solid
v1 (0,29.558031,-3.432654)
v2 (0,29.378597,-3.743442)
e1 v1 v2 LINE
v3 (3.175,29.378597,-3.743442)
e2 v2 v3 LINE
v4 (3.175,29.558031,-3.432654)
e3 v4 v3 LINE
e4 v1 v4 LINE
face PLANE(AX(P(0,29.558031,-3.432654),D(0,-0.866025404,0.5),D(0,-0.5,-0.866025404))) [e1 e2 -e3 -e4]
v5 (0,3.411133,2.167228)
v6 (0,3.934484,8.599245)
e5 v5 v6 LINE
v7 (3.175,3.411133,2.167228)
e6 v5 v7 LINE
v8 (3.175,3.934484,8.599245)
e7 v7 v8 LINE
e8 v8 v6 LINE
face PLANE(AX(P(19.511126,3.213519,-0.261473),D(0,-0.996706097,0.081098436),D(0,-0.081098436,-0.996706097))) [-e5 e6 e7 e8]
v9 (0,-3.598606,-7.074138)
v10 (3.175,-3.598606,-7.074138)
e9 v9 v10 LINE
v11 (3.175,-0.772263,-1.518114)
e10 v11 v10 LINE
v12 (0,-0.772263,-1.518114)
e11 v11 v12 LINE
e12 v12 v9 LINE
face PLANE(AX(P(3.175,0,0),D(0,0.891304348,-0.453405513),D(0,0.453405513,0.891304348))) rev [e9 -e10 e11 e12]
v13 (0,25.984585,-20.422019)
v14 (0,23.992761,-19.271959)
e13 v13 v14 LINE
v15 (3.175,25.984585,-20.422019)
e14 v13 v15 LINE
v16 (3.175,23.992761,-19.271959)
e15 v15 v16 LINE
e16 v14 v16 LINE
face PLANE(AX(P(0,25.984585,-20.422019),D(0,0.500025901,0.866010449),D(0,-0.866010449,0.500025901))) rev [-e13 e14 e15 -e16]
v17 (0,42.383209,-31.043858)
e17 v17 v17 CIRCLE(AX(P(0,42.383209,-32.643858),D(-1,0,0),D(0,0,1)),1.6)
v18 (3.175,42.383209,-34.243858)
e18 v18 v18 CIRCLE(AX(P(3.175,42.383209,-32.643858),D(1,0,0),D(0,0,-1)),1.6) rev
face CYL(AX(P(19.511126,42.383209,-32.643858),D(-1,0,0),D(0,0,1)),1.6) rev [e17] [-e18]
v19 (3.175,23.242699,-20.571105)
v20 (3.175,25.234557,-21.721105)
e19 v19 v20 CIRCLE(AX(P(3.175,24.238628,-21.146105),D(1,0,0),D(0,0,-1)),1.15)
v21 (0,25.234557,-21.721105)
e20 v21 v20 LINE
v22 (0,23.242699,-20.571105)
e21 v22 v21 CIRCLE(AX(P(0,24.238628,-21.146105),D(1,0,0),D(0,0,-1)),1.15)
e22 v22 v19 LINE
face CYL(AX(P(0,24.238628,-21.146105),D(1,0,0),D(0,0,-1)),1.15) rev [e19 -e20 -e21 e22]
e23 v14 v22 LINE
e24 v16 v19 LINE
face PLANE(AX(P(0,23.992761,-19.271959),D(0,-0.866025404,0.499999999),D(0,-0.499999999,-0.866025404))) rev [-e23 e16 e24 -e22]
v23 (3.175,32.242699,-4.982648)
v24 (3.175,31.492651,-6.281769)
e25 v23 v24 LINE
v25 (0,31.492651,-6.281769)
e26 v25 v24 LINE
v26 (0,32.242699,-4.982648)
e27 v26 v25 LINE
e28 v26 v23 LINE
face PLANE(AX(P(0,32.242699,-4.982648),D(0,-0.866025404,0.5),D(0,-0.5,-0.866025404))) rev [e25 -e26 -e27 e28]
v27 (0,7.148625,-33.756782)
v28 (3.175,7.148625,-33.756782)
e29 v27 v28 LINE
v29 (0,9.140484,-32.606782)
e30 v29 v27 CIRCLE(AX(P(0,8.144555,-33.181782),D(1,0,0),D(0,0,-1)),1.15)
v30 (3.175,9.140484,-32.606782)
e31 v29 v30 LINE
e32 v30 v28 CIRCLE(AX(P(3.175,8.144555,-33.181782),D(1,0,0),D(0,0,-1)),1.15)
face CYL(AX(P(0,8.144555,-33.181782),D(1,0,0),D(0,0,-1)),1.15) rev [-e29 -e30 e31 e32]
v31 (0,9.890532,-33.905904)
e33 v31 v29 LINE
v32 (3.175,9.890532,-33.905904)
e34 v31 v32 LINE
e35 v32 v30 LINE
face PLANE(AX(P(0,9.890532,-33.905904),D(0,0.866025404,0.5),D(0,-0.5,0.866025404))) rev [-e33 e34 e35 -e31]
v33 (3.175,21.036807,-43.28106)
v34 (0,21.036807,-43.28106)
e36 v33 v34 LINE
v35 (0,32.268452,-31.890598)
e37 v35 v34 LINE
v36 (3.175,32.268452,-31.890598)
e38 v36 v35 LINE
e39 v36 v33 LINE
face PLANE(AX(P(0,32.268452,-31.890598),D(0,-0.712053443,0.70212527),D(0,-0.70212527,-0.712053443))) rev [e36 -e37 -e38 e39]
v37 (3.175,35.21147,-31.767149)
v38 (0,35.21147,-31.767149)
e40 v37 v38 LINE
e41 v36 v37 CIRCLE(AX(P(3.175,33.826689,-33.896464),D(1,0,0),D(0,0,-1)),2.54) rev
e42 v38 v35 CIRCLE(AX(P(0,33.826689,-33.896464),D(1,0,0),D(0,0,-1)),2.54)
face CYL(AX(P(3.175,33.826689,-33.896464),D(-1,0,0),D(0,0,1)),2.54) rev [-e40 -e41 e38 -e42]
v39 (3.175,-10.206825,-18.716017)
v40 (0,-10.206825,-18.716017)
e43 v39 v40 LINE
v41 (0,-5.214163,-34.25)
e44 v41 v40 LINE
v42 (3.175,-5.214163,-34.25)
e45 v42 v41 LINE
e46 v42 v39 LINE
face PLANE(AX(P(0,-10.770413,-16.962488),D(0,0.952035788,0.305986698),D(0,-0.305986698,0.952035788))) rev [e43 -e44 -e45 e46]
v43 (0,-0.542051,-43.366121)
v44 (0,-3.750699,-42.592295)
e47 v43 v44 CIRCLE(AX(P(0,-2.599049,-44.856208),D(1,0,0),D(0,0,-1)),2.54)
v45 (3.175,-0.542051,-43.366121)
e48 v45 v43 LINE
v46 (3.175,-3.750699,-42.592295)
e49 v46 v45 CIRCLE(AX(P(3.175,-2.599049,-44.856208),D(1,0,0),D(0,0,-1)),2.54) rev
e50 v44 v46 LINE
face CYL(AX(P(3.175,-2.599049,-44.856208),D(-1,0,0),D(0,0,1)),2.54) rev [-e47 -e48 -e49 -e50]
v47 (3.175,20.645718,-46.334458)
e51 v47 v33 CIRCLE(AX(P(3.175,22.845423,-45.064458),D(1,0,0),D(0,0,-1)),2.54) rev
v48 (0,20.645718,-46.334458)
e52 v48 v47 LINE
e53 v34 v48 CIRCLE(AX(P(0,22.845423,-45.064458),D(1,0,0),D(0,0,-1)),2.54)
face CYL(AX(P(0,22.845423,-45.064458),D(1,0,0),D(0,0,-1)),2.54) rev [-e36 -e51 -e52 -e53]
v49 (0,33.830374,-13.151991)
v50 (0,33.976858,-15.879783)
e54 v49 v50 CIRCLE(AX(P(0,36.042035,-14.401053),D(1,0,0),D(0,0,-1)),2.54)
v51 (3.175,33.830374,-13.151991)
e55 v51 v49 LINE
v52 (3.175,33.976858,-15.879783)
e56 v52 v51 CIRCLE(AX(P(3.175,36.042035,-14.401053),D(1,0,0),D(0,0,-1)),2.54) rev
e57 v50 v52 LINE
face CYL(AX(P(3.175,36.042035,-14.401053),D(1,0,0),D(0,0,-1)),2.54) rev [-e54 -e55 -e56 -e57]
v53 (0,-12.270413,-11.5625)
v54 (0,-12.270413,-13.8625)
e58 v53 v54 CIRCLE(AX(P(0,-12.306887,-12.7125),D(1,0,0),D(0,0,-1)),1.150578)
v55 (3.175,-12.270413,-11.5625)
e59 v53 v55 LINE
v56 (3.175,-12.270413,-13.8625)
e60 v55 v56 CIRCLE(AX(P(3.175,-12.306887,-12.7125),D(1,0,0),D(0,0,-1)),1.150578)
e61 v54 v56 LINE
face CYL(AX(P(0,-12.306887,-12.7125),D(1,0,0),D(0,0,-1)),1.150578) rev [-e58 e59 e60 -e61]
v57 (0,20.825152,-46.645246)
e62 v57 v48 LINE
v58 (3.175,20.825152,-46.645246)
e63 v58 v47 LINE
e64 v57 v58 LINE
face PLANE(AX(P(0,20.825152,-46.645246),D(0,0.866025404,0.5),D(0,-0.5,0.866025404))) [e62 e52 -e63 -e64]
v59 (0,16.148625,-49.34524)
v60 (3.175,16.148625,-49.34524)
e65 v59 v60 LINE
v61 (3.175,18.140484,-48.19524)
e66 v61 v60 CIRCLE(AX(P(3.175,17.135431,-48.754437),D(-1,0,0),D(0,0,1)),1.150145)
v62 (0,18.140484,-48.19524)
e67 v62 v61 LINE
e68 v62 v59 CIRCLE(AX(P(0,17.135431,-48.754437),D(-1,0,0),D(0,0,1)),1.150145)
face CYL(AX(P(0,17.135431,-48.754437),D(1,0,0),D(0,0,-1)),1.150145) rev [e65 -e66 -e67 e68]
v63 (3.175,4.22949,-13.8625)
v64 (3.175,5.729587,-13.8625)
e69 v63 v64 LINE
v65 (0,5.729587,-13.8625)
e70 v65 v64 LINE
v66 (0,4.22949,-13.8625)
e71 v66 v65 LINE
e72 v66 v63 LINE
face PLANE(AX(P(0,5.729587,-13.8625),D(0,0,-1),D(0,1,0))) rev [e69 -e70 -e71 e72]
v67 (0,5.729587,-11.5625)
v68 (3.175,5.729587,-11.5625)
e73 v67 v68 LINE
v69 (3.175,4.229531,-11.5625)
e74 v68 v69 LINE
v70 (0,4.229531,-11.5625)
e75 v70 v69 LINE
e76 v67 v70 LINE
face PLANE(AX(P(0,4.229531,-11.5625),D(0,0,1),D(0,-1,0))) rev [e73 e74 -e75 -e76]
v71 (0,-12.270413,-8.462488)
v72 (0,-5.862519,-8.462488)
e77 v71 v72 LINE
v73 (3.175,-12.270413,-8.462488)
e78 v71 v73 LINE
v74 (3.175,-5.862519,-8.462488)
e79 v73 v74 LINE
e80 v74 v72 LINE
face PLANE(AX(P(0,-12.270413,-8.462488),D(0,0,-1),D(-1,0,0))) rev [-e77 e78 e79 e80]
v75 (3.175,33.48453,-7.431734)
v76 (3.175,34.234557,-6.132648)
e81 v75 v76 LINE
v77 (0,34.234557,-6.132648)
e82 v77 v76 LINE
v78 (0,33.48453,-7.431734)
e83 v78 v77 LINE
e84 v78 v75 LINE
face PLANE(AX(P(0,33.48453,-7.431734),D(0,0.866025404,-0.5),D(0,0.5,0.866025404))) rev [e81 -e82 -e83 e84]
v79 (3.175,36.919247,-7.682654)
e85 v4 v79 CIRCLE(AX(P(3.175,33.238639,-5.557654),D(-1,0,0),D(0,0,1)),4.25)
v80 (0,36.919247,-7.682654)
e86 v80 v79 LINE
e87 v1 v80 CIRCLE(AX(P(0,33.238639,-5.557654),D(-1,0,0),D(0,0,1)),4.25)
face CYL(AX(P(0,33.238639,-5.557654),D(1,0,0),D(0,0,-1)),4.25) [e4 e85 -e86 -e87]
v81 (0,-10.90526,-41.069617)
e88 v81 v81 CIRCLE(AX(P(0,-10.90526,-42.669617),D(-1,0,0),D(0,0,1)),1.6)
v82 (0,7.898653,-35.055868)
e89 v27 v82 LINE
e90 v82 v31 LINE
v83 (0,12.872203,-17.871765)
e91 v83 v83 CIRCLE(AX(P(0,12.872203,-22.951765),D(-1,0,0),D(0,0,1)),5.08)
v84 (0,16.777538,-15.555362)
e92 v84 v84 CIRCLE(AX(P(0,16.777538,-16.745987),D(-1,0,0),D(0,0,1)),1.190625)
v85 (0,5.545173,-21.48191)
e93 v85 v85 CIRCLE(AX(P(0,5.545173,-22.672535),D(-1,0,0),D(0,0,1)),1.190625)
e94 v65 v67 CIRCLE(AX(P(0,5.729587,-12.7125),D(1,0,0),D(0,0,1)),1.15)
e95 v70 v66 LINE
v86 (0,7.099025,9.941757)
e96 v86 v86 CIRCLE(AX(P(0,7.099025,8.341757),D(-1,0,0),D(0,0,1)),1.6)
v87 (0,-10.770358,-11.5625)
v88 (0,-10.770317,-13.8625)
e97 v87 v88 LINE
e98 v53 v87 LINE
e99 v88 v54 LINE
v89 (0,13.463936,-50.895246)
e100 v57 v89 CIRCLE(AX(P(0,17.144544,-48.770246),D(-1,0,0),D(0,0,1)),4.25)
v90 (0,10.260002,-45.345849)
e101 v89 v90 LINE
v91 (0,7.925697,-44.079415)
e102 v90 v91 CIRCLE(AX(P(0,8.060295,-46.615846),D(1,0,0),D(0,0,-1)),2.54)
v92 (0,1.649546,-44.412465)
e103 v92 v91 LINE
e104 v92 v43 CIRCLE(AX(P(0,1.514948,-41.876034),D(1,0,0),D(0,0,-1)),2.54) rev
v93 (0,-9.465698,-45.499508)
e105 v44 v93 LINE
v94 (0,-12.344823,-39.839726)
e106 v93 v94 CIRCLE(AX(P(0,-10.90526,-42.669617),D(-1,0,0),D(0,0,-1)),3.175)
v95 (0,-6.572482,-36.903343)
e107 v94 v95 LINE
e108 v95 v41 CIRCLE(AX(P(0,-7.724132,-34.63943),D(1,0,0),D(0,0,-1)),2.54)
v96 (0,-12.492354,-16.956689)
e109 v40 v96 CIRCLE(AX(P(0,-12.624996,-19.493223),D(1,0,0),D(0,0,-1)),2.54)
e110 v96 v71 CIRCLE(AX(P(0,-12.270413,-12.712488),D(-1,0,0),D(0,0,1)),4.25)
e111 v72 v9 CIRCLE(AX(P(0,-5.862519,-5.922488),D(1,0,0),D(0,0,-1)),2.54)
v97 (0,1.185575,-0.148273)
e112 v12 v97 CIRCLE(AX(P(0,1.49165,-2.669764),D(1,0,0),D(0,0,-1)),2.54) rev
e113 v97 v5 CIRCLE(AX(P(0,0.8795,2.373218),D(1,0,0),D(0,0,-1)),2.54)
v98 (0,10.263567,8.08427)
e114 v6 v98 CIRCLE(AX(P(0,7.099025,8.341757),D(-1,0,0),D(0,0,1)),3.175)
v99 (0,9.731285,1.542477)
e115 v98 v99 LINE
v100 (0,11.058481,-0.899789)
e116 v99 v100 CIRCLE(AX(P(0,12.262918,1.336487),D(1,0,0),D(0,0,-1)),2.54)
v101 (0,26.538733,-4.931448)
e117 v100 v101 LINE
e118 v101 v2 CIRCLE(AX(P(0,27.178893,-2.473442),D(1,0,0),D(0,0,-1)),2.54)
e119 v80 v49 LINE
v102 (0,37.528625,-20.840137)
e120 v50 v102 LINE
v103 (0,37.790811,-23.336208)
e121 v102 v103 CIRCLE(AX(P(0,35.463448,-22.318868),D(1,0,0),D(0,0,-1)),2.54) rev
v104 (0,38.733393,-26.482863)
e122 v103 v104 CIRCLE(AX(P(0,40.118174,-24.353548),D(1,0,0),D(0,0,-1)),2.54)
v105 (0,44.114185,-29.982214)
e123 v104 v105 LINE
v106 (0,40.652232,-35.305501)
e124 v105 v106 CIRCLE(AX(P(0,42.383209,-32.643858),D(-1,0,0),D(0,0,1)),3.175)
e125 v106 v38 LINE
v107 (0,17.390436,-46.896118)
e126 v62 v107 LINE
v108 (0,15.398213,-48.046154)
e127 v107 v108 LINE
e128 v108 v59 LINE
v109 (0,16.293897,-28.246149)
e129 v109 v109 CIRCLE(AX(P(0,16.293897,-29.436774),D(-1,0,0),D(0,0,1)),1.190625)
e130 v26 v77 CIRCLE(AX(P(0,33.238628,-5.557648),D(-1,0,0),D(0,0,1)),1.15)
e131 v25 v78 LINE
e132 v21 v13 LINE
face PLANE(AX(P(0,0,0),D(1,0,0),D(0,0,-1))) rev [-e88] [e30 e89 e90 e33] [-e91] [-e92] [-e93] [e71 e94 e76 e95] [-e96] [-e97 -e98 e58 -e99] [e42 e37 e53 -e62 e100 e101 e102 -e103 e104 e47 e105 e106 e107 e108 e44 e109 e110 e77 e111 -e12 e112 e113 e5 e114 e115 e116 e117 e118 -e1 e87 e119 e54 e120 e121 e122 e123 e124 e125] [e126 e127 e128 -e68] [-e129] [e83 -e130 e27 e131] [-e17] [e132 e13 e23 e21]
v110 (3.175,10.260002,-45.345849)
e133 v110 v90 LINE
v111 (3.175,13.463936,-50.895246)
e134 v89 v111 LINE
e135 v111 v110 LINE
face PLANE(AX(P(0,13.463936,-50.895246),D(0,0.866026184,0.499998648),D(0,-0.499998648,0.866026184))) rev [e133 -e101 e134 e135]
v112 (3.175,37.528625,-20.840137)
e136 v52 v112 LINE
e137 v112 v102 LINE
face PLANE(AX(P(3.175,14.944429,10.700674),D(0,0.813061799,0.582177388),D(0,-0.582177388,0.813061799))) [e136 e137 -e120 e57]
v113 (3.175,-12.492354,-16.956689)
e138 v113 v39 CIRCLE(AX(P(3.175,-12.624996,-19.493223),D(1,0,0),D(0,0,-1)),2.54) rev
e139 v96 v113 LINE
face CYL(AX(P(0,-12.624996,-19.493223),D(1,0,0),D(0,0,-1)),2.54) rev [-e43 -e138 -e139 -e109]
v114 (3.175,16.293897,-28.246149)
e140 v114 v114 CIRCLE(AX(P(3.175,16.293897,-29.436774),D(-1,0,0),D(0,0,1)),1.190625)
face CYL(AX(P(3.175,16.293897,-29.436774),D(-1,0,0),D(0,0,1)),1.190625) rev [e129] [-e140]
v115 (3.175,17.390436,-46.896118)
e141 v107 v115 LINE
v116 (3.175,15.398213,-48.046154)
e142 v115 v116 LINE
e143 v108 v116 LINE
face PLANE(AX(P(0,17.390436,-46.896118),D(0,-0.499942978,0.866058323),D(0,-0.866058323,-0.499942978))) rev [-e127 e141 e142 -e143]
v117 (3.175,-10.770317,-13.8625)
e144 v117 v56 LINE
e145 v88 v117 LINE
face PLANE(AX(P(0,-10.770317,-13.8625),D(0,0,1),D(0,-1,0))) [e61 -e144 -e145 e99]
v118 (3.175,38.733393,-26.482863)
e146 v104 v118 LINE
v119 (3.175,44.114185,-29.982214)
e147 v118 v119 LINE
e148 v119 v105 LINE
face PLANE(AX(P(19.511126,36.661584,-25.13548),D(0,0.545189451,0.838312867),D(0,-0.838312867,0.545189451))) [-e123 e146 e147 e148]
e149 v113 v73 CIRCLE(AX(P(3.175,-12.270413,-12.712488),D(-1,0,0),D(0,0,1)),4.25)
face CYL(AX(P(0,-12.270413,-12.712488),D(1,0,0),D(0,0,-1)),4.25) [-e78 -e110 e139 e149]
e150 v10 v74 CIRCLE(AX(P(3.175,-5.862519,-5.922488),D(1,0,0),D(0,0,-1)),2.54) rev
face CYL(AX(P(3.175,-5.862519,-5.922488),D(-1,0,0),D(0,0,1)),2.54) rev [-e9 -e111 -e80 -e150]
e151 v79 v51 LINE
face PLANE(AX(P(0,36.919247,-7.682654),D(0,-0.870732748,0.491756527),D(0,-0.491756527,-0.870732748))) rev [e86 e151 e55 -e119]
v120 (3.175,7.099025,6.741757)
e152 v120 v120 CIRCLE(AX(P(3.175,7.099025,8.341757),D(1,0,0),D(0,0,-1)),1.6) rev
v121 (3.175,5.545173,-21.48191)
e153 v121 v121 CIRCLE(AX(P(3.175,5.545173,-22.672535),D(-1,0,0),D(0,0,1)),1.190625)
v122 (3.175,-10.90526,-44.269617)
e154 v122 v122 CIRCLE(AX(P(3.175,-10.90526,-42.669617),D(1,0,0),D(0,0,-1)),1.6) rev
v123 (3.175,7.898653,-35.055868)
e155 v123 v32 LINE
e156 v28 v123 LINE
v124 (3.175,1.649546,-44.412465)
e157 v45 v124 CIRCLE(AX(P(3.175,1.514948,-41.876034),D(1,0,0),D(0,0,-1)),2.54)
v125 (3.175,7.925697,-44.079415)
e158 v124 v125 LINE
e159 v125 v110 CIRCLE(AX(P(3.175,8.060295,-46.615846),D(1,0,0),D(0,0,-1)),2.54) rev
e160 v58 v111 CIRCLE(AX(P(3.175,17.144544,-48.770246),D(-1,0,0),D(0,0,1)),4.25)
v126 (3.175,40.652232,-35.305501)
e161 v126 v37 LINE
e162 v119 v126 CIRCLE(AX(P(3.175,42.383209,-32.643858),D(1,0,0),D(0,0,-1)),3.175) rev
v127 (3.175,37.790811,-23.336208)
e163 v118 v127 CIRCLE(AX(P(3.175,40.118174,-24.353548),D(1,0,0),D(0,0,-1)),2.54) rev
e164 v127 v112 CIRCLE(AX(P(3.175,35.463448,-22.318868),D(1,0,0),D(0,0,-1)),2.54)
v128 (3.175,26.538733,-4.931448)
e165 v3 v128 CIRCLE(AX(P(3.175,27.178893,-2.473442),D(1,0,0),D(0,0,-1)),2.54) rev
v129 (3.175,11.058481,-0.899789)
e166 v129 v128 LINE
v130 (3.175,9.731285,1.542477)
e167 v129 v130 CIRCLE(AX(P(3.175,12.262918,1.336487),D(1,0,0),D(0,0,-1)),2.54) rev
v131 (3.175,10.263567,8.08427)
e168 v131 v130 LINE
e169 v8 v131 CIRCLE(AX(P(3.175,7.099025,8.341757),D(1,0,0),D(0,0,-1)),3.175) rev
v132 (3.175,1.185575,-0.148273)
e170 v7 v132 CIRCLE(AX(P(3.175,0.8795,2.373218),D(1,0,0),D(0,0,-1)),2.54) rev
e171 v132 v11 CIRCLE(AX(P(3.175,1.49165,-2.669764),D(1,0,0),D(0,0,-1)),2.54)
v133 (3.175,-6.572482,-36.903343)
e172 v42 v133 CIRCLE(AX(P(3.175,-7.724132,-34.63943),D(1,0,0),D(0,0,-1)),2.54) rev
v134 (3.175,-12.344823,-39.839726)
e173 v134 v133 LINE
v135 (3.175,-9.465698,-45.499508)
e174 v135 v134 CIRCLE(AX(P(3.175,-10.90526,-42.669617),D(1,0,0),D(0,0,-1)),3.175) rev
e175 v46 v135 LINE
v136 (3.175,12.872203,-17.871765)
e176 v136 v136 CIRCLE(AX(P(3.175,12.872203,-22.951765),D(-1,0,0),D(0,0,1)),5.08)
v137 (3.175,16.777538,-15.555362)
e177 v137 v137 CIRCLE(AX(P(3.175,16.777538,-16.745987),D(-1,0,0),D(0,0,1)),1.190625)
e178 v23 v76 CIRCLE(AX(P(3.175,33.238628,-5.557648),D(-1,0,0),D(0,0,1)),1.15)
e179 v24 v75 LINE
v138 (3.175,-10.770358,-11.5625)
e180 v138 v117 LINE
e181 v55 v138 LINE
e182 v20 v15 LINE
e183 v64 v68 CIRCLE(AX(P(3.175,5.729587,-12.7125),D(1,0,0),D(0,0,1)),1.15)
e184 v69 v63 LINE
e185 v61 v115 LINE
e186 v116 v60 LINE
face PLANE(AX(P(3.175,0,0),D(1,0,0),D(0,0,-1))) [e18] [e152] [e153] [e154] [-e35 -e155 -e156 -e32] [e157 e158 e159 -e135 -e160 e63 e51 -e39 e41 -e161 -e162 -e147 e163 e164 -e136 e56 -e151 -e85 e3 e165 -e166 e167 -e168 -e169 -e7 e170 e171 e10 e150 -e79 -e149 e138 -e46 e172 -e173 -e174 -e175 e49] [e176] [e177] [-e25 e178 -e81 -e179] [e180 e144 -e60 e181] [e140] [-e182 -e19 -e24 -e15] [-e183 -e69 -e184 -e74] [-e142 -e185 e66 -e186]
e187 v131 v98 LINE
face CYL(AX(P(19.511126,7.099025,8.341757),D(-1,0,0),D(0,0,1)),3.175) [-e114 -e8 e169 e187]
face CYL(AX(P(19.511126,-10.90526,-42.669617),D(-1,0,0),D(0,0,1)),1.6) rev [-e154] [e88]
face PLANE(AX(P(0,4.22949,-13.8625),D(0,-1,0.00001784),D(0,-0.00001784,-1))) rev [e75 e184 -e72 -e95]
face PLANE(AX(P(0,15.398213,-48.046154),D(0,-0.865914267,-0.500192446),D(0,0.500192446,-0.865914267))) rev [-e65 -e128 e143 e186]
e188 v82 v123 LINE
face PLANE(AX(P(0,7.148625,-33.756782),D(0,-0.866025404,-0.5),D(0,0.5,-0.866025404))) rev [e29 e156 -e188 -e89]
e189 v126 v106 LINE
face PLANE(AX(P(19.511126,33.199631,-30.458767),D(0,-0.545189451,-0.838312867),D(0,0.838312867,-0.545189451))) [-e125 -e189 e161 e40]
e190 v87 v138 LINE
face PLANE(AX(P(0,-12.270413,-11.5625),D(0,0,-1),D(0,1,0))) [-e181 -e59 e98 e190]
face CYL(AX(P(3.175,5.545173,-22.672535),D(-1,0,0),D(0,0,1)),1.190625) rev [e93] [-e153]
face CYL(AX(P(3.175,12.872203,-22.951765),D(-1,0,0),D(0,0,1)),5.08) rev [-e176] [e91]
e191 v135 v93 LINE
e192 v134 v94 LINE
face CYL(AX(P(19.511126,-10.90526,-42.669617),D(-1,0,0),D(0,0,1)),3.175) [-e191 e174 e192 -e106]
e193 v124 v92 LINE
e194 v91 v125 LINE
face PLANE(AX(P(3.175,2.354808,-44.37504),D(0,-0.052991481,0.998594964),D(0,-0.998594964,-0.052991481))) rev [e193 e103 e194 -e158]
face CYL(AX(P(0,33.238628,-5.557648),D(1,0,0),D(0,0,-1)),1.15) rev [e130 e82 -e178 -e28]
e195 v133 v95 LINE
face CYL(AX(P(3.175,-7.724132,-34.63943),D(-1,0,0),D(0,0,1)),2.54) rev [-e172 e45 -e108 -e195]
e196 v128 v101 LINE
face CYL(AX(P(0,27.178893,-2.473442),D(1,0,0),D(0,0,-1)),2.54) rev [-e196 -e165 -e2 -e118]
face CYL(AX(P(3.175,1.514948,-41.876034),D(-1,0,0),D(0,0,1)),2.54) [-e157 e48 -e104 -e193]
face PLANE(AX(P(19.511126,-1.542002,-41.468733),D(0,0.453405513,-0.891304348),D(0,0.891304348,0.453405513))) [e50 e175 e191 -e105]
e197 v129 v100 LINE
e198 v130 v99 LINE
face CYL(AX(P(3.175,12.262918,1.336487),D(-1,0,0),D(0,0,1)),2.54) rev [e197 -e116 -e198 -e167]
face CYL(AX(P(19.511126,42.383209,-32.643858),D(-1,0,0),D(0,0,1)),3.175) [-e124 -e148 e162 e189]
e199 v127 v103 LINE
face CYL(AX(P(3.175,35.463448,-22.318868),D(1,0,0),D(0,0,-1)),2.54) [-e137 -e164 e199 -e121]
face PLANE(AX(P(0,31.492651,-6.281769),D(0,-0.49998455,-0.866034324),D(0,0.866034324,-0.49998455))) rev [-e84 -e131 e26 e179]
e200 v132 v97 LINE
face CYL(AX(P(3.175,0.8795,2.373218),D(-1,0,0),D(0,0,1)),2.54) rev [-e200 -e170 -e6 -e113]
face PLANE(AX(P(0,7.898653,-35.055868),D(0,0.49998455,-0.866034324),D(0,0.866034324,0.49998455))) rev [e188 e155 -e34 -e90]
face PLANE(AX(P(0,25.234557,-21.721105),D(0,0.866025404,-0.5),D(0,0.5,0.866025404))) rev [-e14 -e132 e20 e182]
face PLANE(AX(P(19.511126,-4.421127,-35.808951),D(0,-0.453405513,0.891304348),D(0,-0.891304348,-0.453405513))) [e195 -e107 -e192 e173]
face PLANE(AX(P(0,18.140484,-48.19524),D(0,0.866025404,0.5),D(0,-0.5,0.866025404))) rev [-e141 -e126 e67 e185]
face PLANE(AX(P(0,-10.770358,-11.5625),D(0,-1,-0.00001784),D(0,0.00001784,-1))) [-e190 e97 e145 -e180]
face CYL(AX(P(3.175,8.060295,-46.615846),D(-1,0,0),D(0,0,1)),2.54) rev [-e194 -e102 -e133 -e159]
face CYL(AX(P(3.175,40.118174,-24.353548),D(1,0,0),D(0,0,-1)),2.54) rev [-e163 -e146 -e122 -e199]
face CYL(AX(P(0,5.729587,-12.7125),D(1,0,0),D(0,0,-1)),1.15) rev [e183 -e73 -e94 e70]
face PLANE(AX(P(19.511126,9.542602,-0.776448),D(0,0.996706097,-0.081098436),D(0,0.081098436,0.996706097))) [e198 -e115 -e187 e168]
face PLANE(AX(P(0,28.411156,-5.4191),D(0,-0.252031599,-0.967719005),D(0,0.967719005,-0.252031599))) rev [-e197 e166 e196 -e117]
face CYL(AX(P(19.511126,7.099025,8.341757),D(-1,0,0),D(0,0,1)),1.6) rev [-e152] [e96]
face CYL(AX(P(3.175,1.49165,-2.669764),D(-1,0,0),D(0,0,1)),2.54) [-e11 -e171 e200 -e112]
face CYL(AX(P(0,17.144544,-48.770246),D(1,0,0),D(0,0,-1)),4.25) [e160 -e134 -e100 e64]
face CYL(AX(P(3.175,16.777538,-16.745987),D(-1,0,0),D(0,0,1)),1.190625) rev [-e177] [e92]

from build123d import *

# Parameters (mm, degrees)
BOSS_EXTRUDE1_DEPTH = 3.175
SKETCH8_W           = 24
SKETCH8_H           = 4.7625
BOSS_EXTRUDE2_DEPTH = 3.175
BOSS_EXTRUDE3_DEPTH = 3.175
CUT_EXTRUDE8_DEPTH  = 3.175
CUT_EXTRUDE7_DEPTH  = 3.175
FILLET1_R           = 2.54
FILLET2_R           = 2.54
SKETCH13_R          = 1.190625
CUT_EXTRUDE9_DEPTH  = 3.175
SKETCH17_R          = 1.6
BOSS_EXTRUDE5_DEPTH = 3.175
FILLET4_R           = 2.54
SKETCH20_R          = 5.08
CUT_EXTRUDE12_DEPTH = 70.976978338


with BuildPart() as part:
    # Sketch1 → Boss-Extrude1 (new body)
    with BuildSketch(Plane(origin=(0, 0, 0), x_dir=(0, 0, -1), z_dir=(1, 0, 0))):
        Polygon((43.890597967, 11.483842091), (31.890597967, 32.268451781), (22.25, 38.538130468), (44.5, 0), align=None)
        Polygon((22.25, 38.538130468), (44.5, 0), (0, 0), align=None)
        Polygon((0.899789316, 11.058480811), (12.899789316, 31.843090502), (22.25, 38.538130468), (0, 0), align=None)
        Polygon((10.25, -5.214163404), (34.25, -5.214163404), (44.5, 0), (0, 0), align=None)
    extrude(amount=BOSS_EXTRUDE1_DEPTH)

    # Sketch8 → Boss-Extrude2 (add)
    with BuildSketch(Plane.ZY):
        Polygon((-43.890597967, 11.483842091), (-31.890597967, 32.268451781), (-36.015043953, 34.649701781), (-48.015043953, 13.865092091), align=None)
        with Locations((-22.25, -7.595413404)):
            Rectangle(SKETCH8_W, SKETCH8_H)
        Polygon((-12.899789316, 31.843090502), (-0.899789316, 11.058480811), (3.22465667, 13.439730811), (-8.77534333, 34.224340502), align=None)
    extrude(amount=-BOSS_EXTRUDE2_DEPTH)

    # Sketch9 → Boss-Extrude3 (add)
    # profile 1 of 3: a face of its own
    with BuildSketch(Plane(origin=(3.175, 0, 0), x_dir=(0, 0, -1), z_dir=(1, 0, 0))):
        with BuildLine():
            Line((3.432653779, 29.558030749), (5.419099548, 28.411155749))
            Line((5.419099548, 28.411155749), (8.77534333, 34.224340502))
            Line((8.77534333, 34.224340502), (12.899789316, 31.843090502))
            Line((12.899789316, 31.843090502), (14.562601584, 33.033715502))
            Line((14.562601584, 33.033715502), (7.682653779, 36.919246681))
            ThreePointArc((7.682653779, 36.919246681), (1.877045812, 35.363638715), (3.432653779, 29.558030749))
        make_face()
        with BuildLine():
            Line((4.98264756, 32.24269873), (6.281769095, 31.492650563))
            Line((6.281769095, 31.492650563), (7.43173356, 33.484529507))
            Line((7.43173356, 33.484529507), (6.13264756, 34.234557159))
            ThreePointArc((6.13264756, 34.234557159), (4.561718346, 33.813627945), (4.98264756, 32.24269873))
        make_face(mode=Mode.SUBTRACT)
    # profile 2 of 3: a face of its own
    with BuildSketch(Plane(origin=(3.175, 0, 0), x_dir=(0, 0, -1), z_dir=(1, 0, 0))):
        with BuildLine():
            Line((8.462487563, -12.270413404), (8.462487563, -4.304857849))
            Line((8.462487563, -4.304857849), (10.25, -5.214163404))
            Line((10.25, -5.214163404), (10.25, -9.976663404))
            Line((10.25, -9.976663404), (20.606380555, -9.976663404))
            Line((20.606380555, -9.976663404), (20.606380555, -10.770413404))
            Line((20.606380555, -10.770413404), (16.962487563, -10.770413404))
            Line((16.962487563, -10.770413404), (16.962487563, -12.270413404))
            ThreePointArc((16.962487563, -12.270413404), (12.712487563, -16.520413404), (8.462487563, -12.270413404))
        make_face()
        with BuildLine():
            Line((11.5625, -12.270413404), (11.5625, -10.7703581))
            Line((11.5625, -10.7703581), (13.8625, -10.770317068))
            Line((13.8625, -10.770317068), (13.8625, -12.270413404))
            ThreePointArc((13.8625, -12.270413404), (12.7125, -13.457465158), (11.5625, -12.270413404))
        make_face(mode=Mode.SUBTRACT)
    # profile 3 of 3: a face of its own
    with BuildSketch(Plane(origin=(3.175, 0, 0), x_dir=(0, 0, -1), z_dir=(1, 0, 0))):
        with BuildLine():
            Line((46.645245941, 20.825151843), (44.658800171, 19.678276843))
            Line((44.658800171, 19.678276843), (48.015043953, 13.865092091))
            Line((48.015043953, 13.865092091), (43.890597967, 11.483842091))
            Line((43.890597967, 11.483842091), (43.996871736, 9.481172067))
            Line((43.996871736, 9.481172067), (50.895245941, 13.463935911))
            ThreePointArc((50.895245941, 13.463935911), (52.450853907, 19.269543877), (46.645245941, 20.825151843))
        make_face()
        with BuildLine():
            Line((48.195239723, 18.140483862), (46.896118188, 17.390435694))
            Line((46.896118188, 17.390435694), (48.046153723, 15.398212801))
            Line((48.046153723, 15.398212801), (49.345239723, 16.148625433))
            ThreePointArc((49.345239723, 16.148625433), (49.750491106, 17.710503048), (48.195239723, 18.140483862))
        make_face(mode=Mode.SUBTRACT)
    extrude(amount=-BOSS_EXTRUDE3_DEPTH)

    # Sketch12 → Cut-Extrude8 (cut)
    with BuildSketch(Plane(origin=(3.175, 0, 0), x_dir=(0, 0, -1), z_dir=(1, 0, 0))):
        with BuildLine():
            Line((33.756782454, 7.148625433), (35.055868454, 7.898653085))
            Line((35.055868454, 7.898653085), (33.905903989, 9.89053203))
            Line((33.905903989, 9.89053203), (32.606782454, 9.140483862))
            ThreePointArc((32.606782454, 9.140483862), (32.18585324, 7.569554647), (33.756782454, 7.148625433))
        make_face()
        with BuildLine():
            Line((21.721104828, 25.234557159), (20.422018828, 25.984584811))
            Line((20.422018828, 25.984584811), (19.271959255, 23.992760775))
            Line((19.271959255, 23.992760775), (20.571104828, 23.24269873))
            ThreePointArc((20.571104828, 23.24269873), (22.142034043, 23.663627945), (21.721104828, 25.234557159))
        make_face()
        with BuildLine():
            Line((13.8625, 5.729586596), (13.8625, 4.229490261))
            Line((13.8625, 4.229490261), (11.5625, 4.229531293))
            Line((11.5625, 4.229531293), (11.5625, 5.729586596))
            ThreePointArc((11.5625, 5.729586596), (12.7125, 6.879586596), (13.8625, 5.729586596))
        make_face()
    extrude(amount=-CUT_EXTRUDE8_DEPTH, mode=Mode.SUBTRACT)

    # Sketch10 → Cut-Extrude7 (cut)
    with BuildSketch(Plane(origin=(3.175, 0, 0), x_dir=(0, 0, -1), z_dir=(1, 0, 0))):
        Polygon((31.890597967, 32.268451781), (44.658800171, 19.678276843), (36.015043953, 34.649701781), align=None)
        Polygon((5.419099548, 28.411155749), (0.899789316, 11.058480811), (-3.22465667, 13.439730811), align=None)
        Polygon((16.962487563, -10.770413404), (34.25, -5.214163404), (34.25, -11.414104667), align=None)
    extrude(amount=-CUT_EXTRUDE7_DEPTH, mode=Mode.SUBTRACT)

    # Fillet1
    fillet1_edges = [part.edges().sort_by_distance(p)[0] for p in [
        (1.5875, -10.770413404, -16.962487563),
    ]]
    fillet(fillet1_edges, radius=FILLET1_R)

    # Fillet2
    fillet2_edges = [part.edges().sort_by_distance(p)[0] for p in [
        (1.5875, -4.304857849, -8.462487563),
        (1.5875, 0, -44.5),
        (1.5875, 0, 0),
        (1.5875, 38.538130468, -22.25),
        (1.5875, 33.033715502, -14.562601584),
        (1.5875, 28.411155749, -5.419099548),
        (1.5875, 19.678276843, -44.658800171),
        (1.5875, 9.481172067, -43.996871736),
    ]]
    fillet(fillet2_edges, radius=FILLET2_R)

    # Sketch13 → Cut-Extrude9 (cut)
    with BuildSketch(Plane.ZY):
        with BuildLine():
            ThreePointArc((-15.555361616, 16.777538207), (-16.768661404, 17.967947273), (-17.935747959, 16.732196856))
            Line((-17.935747959, 16.732196856), (-16.745986616, 16.777538207))
            Line((-16.745986616, 16.777538207), (-17.301600526, 15.724503984))
            ThreePointArc((-17.301600526, 15.724503984), (-16.131145141, 15.757951109), (-15.555361616, 16.777538207))
        make_face()
        with BuildLine():
            Line((-16.745986616, 16.777538207), (-17.935747959, 16.732196856))
            ThreePointArc((-17.935747959, 16.732196856), (-17.753679488, 16.143390774), (-17.301600526, 15.724503984))
            Line((-17.301600526, 15.724503984), (-16.745986616, 16.777538207))
        make_face()
        with Locations((-22.672534986, 5.545173165)):
            Circle(SKETCH13_R)
        with Locations((-29.436774271, 16.293897131)):
            Circle(SKETCH13_R)
    extrude(amount=-CUT_EXTRUDE9_DEPTH, mode=Mode.SUBTRACT)

    # Sketch17 → Boss-Extrude5 (add)
    # profile 1 of 3: a face of its own
    with BuildSketch(Plane.ZY):
        with BuildLine():
            Line((-35.808950658, -4.421126968), (-39.839725672, -12.34482262))
            ThreePointArc((-39.839725672, -12.34482262), (-44.109179481, -13.735151419), (-45.499508281, -9.46569761))
            Line((-45.499508281, -9.46569761), (-41.468733267, -1.542001958))
            Line((-41.468733267, -1.542001958), (-35.808950658, -4.421126968))
        make_face()
        with Locations((-42.669616976, -10.905260115)):
            Circle(SKETCH17_R, mode=Mode.SUBTRACT)
    # profile 2 of 3: a face of its own
    with BuildSketch(Plane.ZY):
        with BuildLine():
            Line((-0.261472593, 3.213518539), (8.599244609, 3.934483634))
            ThreePointArc((8.599244609, 3.934483634), (11.506298933, 7.356513026), (8.084269542, 10.26356735))
            Line((8.084269542, 10.26356735), (-0.77644766, 9.542602255))
            Line((-0.77644766, 9.542602255), (-0.261472593, 3.213518539))
        make_face()
        with Locations((8.341757075, 7.099025492)):
            Circle(SKETCH17_R, mode=Mode.SUBTRACT)
    # profile 3 of 3: a face of its own
    with BuildSketch(Plane.ZY):
        with BuildLine():
            Line((-25.13548002, 36.661583739), (-29.98221424, 44.114185124))
            ThreePointArc((-29.98221424, 44.114185124), (-34.374834099, 45.044851969), (-35.305500944, 40.65223211))
            Line((-35.305500944, 40.65223211), (-30.458766724, 33.199630725))
            Line((-30.458766724, 33.199630725), (-25.13548002, 36.661583739))
        make_face()
        with Locations((-32.643857592, 42.383208617)):
            Circle(SKETCH17_R, mode=Mode.SUBTRACT)
    extrude(amount=-BOSS_EXTRUDE5_DEPTH)

    # Fillet4
    # the kernel refuses this fillet: 2.54 mm, written as the material it adds along each edge
    with BuildSketch(Plane(origin=(0, 36.661583739, -25.13548002), x_dir=(0, 0.5315830218036889, 0.8470061929703104), z_dir=(1, 0, 0))) as fillet4_piece_1:
        with BuildLine():
            CenterArc((2.499765737, -2.512091747), FILLET4_R, 98.501304121, 80.573560632)
            Line((-0.039903163, -2.471081023), (-0.293870053, -2.46697995))
            Line((-0.293870053, -2.46697995), (-0.25396689, 0.004101072))
            Line((-0.25396689, 0.004101072), (0.004101072, 0.25396689))
            ThreePointArc((0.004101072, 0.25396689), (1.711869919, 0.226389737), (2.086723346, 0.251209175))
            Line((2.086723346, 0.251209175), (2.124272654, 0))
        make_face()
    extrude(amount=3.175)
    with BuildSketch(Plane(origin=(0, 33.199630725, -30.458766724), x_dir=(0, -0.5451894510403108, -0.838312866699757), z_dir=(1, 0, 0))) as fillet4_piece_2:
        with BuildLine():
            CenterArc((2.54, 2.399867047), FILLET4_R, 180, 70.879109992)
            Line((0, 2.399867047), (-0.0508, 2.399867047))
            Line((-0.0508, 2.399867047), (-0.0508, 0))
            Line((-0.0508, 0), (0, -0.0508))
            ThreePointArc((0, -0.0508), (0.853995746, -0.0508), (1.691351321, -0.047997341))
            Line((1.691351321, -0.047997341), (1.707991491, 0))
        make_face()
    extrude(amount=3.175)
    with BuildSketch(Plane(origin=(0, -1.542001958, -41.468733267), x_dir=(0, 0.466230647669412, -0.8846632032439015), z_dir=(1, 0, 0))) as fillet4_piece_3:
        with BuildLine():
            CenterArc((2.503946527, -2.514474671), FILLET4_R, 98.12963068, 81.042861753)
            Line((-0.035788565, -2.477791408), (-0.289762074, -2.474123082))
            Line((-0.289762074, -2.474123082), (-0.253973509, 0.003668326))
            Line((-0.253973509, 0.003668326), (0.003668326, 0.253973509))
            ThreePointArc((0.003668326, 0.253973509), (1.752552501, 0.228713088), (2.108838028, 0.251447467))
            Line((2.108838028, 0.251447467), (2.144756982, 0))
        make_face()
    extrude(amount=3.175)
    with BuildSketch(Plane(origin=(0, -4.421126968, -35.808950658), x_dir=(0, -0.4534055133611399, 0.8913043478261066), z_dir=(1, 0, 0))) as fillet4_piece_4:
        with BuildLine():
            CenterArc((2.54, 2.413715879), FILLET4_R, 180, 71.856915027)
            Line((0, 2.413715879), (-0.0508, 2.413715879))
            Line((-0.0508, 2.413715879), (-0.0508, 0))
            Line((-0.0508, 0), (0, -0.0508))
            ThreePointArc((0, -0.0508), (0.874533296, -0.0508), (1.733247924, -0.048274318))
            Line((1.733247924, -0.048274318), (1.749066592, 0))
        make_face()
    extrude(amount=3.175)
    with BuildSketch(Plane(origin=(0, 9.542602255, -0.77644766), x_dir=(0, 0.9967060969511591, -0.08109843586892752), z_dir=(1, 0, 0))) as fillet4_piece_5:
        with BuildLine():
            CenterArc((2.54, 2.326587881), FILLET4_R, 180, 66.345211462)
            Line((0, 2.326587881), (-0.0508, 2.326587881))
            Line((-0.0508, 2.326587881), (-0.0508, 0))
            Line((-0.0508, 0), (0, -0.0508))
            ThreePointArc((0, -0.0508), (0.760444107, -0.0508), (1.500505979, -0.046531758))
            Line((1.500505979, -0.046531758), (1.520888214, 0))
        make_face()
    extrude(amount=3.175)
    with BuildSketch(Plane(origin=(0, 3.213518539, -0.261472593), x_dir=(0, -0.9984457063976324, 0.05573303666706552), z_dir=(1, 0, 0))) as fillet4_piece_6:
        with BuildLine():
            CenterArc((2.477230301, -2.500513603), FILLET4_R, 100.115998519, 78.42721807)
            Line((-0.061948733, -2.435939367), (-0.315866636, -2.429481943))
            Line((-0.315866636, -2.429481943), (-0.253917903, 0.006457424))
            Line((-0.253917903, 0.006457424), (0.006457424, 0.253917903))
            ThreePointArc((0.006457424, 0.253917903), (1.526854064, 0.215252472), (1.986487618, 0.25005136))
            Line((1.986487618, 0.25005136), (2.031100589, 0))
        make_face()
    extrude(amount=3.175)

    # Sketch20 → Cut-Extrude12 (cut, through all)
    with BuildSketch(Plane.ZY):
        with Locations((-22.951765291, 12.872202834)):
            Circle(SKETCH20_R)
    extrude(amount=-CUT_EXTRUDE12_DEPTH, mode=Mode.SUBTRACT)


solid = part.part
